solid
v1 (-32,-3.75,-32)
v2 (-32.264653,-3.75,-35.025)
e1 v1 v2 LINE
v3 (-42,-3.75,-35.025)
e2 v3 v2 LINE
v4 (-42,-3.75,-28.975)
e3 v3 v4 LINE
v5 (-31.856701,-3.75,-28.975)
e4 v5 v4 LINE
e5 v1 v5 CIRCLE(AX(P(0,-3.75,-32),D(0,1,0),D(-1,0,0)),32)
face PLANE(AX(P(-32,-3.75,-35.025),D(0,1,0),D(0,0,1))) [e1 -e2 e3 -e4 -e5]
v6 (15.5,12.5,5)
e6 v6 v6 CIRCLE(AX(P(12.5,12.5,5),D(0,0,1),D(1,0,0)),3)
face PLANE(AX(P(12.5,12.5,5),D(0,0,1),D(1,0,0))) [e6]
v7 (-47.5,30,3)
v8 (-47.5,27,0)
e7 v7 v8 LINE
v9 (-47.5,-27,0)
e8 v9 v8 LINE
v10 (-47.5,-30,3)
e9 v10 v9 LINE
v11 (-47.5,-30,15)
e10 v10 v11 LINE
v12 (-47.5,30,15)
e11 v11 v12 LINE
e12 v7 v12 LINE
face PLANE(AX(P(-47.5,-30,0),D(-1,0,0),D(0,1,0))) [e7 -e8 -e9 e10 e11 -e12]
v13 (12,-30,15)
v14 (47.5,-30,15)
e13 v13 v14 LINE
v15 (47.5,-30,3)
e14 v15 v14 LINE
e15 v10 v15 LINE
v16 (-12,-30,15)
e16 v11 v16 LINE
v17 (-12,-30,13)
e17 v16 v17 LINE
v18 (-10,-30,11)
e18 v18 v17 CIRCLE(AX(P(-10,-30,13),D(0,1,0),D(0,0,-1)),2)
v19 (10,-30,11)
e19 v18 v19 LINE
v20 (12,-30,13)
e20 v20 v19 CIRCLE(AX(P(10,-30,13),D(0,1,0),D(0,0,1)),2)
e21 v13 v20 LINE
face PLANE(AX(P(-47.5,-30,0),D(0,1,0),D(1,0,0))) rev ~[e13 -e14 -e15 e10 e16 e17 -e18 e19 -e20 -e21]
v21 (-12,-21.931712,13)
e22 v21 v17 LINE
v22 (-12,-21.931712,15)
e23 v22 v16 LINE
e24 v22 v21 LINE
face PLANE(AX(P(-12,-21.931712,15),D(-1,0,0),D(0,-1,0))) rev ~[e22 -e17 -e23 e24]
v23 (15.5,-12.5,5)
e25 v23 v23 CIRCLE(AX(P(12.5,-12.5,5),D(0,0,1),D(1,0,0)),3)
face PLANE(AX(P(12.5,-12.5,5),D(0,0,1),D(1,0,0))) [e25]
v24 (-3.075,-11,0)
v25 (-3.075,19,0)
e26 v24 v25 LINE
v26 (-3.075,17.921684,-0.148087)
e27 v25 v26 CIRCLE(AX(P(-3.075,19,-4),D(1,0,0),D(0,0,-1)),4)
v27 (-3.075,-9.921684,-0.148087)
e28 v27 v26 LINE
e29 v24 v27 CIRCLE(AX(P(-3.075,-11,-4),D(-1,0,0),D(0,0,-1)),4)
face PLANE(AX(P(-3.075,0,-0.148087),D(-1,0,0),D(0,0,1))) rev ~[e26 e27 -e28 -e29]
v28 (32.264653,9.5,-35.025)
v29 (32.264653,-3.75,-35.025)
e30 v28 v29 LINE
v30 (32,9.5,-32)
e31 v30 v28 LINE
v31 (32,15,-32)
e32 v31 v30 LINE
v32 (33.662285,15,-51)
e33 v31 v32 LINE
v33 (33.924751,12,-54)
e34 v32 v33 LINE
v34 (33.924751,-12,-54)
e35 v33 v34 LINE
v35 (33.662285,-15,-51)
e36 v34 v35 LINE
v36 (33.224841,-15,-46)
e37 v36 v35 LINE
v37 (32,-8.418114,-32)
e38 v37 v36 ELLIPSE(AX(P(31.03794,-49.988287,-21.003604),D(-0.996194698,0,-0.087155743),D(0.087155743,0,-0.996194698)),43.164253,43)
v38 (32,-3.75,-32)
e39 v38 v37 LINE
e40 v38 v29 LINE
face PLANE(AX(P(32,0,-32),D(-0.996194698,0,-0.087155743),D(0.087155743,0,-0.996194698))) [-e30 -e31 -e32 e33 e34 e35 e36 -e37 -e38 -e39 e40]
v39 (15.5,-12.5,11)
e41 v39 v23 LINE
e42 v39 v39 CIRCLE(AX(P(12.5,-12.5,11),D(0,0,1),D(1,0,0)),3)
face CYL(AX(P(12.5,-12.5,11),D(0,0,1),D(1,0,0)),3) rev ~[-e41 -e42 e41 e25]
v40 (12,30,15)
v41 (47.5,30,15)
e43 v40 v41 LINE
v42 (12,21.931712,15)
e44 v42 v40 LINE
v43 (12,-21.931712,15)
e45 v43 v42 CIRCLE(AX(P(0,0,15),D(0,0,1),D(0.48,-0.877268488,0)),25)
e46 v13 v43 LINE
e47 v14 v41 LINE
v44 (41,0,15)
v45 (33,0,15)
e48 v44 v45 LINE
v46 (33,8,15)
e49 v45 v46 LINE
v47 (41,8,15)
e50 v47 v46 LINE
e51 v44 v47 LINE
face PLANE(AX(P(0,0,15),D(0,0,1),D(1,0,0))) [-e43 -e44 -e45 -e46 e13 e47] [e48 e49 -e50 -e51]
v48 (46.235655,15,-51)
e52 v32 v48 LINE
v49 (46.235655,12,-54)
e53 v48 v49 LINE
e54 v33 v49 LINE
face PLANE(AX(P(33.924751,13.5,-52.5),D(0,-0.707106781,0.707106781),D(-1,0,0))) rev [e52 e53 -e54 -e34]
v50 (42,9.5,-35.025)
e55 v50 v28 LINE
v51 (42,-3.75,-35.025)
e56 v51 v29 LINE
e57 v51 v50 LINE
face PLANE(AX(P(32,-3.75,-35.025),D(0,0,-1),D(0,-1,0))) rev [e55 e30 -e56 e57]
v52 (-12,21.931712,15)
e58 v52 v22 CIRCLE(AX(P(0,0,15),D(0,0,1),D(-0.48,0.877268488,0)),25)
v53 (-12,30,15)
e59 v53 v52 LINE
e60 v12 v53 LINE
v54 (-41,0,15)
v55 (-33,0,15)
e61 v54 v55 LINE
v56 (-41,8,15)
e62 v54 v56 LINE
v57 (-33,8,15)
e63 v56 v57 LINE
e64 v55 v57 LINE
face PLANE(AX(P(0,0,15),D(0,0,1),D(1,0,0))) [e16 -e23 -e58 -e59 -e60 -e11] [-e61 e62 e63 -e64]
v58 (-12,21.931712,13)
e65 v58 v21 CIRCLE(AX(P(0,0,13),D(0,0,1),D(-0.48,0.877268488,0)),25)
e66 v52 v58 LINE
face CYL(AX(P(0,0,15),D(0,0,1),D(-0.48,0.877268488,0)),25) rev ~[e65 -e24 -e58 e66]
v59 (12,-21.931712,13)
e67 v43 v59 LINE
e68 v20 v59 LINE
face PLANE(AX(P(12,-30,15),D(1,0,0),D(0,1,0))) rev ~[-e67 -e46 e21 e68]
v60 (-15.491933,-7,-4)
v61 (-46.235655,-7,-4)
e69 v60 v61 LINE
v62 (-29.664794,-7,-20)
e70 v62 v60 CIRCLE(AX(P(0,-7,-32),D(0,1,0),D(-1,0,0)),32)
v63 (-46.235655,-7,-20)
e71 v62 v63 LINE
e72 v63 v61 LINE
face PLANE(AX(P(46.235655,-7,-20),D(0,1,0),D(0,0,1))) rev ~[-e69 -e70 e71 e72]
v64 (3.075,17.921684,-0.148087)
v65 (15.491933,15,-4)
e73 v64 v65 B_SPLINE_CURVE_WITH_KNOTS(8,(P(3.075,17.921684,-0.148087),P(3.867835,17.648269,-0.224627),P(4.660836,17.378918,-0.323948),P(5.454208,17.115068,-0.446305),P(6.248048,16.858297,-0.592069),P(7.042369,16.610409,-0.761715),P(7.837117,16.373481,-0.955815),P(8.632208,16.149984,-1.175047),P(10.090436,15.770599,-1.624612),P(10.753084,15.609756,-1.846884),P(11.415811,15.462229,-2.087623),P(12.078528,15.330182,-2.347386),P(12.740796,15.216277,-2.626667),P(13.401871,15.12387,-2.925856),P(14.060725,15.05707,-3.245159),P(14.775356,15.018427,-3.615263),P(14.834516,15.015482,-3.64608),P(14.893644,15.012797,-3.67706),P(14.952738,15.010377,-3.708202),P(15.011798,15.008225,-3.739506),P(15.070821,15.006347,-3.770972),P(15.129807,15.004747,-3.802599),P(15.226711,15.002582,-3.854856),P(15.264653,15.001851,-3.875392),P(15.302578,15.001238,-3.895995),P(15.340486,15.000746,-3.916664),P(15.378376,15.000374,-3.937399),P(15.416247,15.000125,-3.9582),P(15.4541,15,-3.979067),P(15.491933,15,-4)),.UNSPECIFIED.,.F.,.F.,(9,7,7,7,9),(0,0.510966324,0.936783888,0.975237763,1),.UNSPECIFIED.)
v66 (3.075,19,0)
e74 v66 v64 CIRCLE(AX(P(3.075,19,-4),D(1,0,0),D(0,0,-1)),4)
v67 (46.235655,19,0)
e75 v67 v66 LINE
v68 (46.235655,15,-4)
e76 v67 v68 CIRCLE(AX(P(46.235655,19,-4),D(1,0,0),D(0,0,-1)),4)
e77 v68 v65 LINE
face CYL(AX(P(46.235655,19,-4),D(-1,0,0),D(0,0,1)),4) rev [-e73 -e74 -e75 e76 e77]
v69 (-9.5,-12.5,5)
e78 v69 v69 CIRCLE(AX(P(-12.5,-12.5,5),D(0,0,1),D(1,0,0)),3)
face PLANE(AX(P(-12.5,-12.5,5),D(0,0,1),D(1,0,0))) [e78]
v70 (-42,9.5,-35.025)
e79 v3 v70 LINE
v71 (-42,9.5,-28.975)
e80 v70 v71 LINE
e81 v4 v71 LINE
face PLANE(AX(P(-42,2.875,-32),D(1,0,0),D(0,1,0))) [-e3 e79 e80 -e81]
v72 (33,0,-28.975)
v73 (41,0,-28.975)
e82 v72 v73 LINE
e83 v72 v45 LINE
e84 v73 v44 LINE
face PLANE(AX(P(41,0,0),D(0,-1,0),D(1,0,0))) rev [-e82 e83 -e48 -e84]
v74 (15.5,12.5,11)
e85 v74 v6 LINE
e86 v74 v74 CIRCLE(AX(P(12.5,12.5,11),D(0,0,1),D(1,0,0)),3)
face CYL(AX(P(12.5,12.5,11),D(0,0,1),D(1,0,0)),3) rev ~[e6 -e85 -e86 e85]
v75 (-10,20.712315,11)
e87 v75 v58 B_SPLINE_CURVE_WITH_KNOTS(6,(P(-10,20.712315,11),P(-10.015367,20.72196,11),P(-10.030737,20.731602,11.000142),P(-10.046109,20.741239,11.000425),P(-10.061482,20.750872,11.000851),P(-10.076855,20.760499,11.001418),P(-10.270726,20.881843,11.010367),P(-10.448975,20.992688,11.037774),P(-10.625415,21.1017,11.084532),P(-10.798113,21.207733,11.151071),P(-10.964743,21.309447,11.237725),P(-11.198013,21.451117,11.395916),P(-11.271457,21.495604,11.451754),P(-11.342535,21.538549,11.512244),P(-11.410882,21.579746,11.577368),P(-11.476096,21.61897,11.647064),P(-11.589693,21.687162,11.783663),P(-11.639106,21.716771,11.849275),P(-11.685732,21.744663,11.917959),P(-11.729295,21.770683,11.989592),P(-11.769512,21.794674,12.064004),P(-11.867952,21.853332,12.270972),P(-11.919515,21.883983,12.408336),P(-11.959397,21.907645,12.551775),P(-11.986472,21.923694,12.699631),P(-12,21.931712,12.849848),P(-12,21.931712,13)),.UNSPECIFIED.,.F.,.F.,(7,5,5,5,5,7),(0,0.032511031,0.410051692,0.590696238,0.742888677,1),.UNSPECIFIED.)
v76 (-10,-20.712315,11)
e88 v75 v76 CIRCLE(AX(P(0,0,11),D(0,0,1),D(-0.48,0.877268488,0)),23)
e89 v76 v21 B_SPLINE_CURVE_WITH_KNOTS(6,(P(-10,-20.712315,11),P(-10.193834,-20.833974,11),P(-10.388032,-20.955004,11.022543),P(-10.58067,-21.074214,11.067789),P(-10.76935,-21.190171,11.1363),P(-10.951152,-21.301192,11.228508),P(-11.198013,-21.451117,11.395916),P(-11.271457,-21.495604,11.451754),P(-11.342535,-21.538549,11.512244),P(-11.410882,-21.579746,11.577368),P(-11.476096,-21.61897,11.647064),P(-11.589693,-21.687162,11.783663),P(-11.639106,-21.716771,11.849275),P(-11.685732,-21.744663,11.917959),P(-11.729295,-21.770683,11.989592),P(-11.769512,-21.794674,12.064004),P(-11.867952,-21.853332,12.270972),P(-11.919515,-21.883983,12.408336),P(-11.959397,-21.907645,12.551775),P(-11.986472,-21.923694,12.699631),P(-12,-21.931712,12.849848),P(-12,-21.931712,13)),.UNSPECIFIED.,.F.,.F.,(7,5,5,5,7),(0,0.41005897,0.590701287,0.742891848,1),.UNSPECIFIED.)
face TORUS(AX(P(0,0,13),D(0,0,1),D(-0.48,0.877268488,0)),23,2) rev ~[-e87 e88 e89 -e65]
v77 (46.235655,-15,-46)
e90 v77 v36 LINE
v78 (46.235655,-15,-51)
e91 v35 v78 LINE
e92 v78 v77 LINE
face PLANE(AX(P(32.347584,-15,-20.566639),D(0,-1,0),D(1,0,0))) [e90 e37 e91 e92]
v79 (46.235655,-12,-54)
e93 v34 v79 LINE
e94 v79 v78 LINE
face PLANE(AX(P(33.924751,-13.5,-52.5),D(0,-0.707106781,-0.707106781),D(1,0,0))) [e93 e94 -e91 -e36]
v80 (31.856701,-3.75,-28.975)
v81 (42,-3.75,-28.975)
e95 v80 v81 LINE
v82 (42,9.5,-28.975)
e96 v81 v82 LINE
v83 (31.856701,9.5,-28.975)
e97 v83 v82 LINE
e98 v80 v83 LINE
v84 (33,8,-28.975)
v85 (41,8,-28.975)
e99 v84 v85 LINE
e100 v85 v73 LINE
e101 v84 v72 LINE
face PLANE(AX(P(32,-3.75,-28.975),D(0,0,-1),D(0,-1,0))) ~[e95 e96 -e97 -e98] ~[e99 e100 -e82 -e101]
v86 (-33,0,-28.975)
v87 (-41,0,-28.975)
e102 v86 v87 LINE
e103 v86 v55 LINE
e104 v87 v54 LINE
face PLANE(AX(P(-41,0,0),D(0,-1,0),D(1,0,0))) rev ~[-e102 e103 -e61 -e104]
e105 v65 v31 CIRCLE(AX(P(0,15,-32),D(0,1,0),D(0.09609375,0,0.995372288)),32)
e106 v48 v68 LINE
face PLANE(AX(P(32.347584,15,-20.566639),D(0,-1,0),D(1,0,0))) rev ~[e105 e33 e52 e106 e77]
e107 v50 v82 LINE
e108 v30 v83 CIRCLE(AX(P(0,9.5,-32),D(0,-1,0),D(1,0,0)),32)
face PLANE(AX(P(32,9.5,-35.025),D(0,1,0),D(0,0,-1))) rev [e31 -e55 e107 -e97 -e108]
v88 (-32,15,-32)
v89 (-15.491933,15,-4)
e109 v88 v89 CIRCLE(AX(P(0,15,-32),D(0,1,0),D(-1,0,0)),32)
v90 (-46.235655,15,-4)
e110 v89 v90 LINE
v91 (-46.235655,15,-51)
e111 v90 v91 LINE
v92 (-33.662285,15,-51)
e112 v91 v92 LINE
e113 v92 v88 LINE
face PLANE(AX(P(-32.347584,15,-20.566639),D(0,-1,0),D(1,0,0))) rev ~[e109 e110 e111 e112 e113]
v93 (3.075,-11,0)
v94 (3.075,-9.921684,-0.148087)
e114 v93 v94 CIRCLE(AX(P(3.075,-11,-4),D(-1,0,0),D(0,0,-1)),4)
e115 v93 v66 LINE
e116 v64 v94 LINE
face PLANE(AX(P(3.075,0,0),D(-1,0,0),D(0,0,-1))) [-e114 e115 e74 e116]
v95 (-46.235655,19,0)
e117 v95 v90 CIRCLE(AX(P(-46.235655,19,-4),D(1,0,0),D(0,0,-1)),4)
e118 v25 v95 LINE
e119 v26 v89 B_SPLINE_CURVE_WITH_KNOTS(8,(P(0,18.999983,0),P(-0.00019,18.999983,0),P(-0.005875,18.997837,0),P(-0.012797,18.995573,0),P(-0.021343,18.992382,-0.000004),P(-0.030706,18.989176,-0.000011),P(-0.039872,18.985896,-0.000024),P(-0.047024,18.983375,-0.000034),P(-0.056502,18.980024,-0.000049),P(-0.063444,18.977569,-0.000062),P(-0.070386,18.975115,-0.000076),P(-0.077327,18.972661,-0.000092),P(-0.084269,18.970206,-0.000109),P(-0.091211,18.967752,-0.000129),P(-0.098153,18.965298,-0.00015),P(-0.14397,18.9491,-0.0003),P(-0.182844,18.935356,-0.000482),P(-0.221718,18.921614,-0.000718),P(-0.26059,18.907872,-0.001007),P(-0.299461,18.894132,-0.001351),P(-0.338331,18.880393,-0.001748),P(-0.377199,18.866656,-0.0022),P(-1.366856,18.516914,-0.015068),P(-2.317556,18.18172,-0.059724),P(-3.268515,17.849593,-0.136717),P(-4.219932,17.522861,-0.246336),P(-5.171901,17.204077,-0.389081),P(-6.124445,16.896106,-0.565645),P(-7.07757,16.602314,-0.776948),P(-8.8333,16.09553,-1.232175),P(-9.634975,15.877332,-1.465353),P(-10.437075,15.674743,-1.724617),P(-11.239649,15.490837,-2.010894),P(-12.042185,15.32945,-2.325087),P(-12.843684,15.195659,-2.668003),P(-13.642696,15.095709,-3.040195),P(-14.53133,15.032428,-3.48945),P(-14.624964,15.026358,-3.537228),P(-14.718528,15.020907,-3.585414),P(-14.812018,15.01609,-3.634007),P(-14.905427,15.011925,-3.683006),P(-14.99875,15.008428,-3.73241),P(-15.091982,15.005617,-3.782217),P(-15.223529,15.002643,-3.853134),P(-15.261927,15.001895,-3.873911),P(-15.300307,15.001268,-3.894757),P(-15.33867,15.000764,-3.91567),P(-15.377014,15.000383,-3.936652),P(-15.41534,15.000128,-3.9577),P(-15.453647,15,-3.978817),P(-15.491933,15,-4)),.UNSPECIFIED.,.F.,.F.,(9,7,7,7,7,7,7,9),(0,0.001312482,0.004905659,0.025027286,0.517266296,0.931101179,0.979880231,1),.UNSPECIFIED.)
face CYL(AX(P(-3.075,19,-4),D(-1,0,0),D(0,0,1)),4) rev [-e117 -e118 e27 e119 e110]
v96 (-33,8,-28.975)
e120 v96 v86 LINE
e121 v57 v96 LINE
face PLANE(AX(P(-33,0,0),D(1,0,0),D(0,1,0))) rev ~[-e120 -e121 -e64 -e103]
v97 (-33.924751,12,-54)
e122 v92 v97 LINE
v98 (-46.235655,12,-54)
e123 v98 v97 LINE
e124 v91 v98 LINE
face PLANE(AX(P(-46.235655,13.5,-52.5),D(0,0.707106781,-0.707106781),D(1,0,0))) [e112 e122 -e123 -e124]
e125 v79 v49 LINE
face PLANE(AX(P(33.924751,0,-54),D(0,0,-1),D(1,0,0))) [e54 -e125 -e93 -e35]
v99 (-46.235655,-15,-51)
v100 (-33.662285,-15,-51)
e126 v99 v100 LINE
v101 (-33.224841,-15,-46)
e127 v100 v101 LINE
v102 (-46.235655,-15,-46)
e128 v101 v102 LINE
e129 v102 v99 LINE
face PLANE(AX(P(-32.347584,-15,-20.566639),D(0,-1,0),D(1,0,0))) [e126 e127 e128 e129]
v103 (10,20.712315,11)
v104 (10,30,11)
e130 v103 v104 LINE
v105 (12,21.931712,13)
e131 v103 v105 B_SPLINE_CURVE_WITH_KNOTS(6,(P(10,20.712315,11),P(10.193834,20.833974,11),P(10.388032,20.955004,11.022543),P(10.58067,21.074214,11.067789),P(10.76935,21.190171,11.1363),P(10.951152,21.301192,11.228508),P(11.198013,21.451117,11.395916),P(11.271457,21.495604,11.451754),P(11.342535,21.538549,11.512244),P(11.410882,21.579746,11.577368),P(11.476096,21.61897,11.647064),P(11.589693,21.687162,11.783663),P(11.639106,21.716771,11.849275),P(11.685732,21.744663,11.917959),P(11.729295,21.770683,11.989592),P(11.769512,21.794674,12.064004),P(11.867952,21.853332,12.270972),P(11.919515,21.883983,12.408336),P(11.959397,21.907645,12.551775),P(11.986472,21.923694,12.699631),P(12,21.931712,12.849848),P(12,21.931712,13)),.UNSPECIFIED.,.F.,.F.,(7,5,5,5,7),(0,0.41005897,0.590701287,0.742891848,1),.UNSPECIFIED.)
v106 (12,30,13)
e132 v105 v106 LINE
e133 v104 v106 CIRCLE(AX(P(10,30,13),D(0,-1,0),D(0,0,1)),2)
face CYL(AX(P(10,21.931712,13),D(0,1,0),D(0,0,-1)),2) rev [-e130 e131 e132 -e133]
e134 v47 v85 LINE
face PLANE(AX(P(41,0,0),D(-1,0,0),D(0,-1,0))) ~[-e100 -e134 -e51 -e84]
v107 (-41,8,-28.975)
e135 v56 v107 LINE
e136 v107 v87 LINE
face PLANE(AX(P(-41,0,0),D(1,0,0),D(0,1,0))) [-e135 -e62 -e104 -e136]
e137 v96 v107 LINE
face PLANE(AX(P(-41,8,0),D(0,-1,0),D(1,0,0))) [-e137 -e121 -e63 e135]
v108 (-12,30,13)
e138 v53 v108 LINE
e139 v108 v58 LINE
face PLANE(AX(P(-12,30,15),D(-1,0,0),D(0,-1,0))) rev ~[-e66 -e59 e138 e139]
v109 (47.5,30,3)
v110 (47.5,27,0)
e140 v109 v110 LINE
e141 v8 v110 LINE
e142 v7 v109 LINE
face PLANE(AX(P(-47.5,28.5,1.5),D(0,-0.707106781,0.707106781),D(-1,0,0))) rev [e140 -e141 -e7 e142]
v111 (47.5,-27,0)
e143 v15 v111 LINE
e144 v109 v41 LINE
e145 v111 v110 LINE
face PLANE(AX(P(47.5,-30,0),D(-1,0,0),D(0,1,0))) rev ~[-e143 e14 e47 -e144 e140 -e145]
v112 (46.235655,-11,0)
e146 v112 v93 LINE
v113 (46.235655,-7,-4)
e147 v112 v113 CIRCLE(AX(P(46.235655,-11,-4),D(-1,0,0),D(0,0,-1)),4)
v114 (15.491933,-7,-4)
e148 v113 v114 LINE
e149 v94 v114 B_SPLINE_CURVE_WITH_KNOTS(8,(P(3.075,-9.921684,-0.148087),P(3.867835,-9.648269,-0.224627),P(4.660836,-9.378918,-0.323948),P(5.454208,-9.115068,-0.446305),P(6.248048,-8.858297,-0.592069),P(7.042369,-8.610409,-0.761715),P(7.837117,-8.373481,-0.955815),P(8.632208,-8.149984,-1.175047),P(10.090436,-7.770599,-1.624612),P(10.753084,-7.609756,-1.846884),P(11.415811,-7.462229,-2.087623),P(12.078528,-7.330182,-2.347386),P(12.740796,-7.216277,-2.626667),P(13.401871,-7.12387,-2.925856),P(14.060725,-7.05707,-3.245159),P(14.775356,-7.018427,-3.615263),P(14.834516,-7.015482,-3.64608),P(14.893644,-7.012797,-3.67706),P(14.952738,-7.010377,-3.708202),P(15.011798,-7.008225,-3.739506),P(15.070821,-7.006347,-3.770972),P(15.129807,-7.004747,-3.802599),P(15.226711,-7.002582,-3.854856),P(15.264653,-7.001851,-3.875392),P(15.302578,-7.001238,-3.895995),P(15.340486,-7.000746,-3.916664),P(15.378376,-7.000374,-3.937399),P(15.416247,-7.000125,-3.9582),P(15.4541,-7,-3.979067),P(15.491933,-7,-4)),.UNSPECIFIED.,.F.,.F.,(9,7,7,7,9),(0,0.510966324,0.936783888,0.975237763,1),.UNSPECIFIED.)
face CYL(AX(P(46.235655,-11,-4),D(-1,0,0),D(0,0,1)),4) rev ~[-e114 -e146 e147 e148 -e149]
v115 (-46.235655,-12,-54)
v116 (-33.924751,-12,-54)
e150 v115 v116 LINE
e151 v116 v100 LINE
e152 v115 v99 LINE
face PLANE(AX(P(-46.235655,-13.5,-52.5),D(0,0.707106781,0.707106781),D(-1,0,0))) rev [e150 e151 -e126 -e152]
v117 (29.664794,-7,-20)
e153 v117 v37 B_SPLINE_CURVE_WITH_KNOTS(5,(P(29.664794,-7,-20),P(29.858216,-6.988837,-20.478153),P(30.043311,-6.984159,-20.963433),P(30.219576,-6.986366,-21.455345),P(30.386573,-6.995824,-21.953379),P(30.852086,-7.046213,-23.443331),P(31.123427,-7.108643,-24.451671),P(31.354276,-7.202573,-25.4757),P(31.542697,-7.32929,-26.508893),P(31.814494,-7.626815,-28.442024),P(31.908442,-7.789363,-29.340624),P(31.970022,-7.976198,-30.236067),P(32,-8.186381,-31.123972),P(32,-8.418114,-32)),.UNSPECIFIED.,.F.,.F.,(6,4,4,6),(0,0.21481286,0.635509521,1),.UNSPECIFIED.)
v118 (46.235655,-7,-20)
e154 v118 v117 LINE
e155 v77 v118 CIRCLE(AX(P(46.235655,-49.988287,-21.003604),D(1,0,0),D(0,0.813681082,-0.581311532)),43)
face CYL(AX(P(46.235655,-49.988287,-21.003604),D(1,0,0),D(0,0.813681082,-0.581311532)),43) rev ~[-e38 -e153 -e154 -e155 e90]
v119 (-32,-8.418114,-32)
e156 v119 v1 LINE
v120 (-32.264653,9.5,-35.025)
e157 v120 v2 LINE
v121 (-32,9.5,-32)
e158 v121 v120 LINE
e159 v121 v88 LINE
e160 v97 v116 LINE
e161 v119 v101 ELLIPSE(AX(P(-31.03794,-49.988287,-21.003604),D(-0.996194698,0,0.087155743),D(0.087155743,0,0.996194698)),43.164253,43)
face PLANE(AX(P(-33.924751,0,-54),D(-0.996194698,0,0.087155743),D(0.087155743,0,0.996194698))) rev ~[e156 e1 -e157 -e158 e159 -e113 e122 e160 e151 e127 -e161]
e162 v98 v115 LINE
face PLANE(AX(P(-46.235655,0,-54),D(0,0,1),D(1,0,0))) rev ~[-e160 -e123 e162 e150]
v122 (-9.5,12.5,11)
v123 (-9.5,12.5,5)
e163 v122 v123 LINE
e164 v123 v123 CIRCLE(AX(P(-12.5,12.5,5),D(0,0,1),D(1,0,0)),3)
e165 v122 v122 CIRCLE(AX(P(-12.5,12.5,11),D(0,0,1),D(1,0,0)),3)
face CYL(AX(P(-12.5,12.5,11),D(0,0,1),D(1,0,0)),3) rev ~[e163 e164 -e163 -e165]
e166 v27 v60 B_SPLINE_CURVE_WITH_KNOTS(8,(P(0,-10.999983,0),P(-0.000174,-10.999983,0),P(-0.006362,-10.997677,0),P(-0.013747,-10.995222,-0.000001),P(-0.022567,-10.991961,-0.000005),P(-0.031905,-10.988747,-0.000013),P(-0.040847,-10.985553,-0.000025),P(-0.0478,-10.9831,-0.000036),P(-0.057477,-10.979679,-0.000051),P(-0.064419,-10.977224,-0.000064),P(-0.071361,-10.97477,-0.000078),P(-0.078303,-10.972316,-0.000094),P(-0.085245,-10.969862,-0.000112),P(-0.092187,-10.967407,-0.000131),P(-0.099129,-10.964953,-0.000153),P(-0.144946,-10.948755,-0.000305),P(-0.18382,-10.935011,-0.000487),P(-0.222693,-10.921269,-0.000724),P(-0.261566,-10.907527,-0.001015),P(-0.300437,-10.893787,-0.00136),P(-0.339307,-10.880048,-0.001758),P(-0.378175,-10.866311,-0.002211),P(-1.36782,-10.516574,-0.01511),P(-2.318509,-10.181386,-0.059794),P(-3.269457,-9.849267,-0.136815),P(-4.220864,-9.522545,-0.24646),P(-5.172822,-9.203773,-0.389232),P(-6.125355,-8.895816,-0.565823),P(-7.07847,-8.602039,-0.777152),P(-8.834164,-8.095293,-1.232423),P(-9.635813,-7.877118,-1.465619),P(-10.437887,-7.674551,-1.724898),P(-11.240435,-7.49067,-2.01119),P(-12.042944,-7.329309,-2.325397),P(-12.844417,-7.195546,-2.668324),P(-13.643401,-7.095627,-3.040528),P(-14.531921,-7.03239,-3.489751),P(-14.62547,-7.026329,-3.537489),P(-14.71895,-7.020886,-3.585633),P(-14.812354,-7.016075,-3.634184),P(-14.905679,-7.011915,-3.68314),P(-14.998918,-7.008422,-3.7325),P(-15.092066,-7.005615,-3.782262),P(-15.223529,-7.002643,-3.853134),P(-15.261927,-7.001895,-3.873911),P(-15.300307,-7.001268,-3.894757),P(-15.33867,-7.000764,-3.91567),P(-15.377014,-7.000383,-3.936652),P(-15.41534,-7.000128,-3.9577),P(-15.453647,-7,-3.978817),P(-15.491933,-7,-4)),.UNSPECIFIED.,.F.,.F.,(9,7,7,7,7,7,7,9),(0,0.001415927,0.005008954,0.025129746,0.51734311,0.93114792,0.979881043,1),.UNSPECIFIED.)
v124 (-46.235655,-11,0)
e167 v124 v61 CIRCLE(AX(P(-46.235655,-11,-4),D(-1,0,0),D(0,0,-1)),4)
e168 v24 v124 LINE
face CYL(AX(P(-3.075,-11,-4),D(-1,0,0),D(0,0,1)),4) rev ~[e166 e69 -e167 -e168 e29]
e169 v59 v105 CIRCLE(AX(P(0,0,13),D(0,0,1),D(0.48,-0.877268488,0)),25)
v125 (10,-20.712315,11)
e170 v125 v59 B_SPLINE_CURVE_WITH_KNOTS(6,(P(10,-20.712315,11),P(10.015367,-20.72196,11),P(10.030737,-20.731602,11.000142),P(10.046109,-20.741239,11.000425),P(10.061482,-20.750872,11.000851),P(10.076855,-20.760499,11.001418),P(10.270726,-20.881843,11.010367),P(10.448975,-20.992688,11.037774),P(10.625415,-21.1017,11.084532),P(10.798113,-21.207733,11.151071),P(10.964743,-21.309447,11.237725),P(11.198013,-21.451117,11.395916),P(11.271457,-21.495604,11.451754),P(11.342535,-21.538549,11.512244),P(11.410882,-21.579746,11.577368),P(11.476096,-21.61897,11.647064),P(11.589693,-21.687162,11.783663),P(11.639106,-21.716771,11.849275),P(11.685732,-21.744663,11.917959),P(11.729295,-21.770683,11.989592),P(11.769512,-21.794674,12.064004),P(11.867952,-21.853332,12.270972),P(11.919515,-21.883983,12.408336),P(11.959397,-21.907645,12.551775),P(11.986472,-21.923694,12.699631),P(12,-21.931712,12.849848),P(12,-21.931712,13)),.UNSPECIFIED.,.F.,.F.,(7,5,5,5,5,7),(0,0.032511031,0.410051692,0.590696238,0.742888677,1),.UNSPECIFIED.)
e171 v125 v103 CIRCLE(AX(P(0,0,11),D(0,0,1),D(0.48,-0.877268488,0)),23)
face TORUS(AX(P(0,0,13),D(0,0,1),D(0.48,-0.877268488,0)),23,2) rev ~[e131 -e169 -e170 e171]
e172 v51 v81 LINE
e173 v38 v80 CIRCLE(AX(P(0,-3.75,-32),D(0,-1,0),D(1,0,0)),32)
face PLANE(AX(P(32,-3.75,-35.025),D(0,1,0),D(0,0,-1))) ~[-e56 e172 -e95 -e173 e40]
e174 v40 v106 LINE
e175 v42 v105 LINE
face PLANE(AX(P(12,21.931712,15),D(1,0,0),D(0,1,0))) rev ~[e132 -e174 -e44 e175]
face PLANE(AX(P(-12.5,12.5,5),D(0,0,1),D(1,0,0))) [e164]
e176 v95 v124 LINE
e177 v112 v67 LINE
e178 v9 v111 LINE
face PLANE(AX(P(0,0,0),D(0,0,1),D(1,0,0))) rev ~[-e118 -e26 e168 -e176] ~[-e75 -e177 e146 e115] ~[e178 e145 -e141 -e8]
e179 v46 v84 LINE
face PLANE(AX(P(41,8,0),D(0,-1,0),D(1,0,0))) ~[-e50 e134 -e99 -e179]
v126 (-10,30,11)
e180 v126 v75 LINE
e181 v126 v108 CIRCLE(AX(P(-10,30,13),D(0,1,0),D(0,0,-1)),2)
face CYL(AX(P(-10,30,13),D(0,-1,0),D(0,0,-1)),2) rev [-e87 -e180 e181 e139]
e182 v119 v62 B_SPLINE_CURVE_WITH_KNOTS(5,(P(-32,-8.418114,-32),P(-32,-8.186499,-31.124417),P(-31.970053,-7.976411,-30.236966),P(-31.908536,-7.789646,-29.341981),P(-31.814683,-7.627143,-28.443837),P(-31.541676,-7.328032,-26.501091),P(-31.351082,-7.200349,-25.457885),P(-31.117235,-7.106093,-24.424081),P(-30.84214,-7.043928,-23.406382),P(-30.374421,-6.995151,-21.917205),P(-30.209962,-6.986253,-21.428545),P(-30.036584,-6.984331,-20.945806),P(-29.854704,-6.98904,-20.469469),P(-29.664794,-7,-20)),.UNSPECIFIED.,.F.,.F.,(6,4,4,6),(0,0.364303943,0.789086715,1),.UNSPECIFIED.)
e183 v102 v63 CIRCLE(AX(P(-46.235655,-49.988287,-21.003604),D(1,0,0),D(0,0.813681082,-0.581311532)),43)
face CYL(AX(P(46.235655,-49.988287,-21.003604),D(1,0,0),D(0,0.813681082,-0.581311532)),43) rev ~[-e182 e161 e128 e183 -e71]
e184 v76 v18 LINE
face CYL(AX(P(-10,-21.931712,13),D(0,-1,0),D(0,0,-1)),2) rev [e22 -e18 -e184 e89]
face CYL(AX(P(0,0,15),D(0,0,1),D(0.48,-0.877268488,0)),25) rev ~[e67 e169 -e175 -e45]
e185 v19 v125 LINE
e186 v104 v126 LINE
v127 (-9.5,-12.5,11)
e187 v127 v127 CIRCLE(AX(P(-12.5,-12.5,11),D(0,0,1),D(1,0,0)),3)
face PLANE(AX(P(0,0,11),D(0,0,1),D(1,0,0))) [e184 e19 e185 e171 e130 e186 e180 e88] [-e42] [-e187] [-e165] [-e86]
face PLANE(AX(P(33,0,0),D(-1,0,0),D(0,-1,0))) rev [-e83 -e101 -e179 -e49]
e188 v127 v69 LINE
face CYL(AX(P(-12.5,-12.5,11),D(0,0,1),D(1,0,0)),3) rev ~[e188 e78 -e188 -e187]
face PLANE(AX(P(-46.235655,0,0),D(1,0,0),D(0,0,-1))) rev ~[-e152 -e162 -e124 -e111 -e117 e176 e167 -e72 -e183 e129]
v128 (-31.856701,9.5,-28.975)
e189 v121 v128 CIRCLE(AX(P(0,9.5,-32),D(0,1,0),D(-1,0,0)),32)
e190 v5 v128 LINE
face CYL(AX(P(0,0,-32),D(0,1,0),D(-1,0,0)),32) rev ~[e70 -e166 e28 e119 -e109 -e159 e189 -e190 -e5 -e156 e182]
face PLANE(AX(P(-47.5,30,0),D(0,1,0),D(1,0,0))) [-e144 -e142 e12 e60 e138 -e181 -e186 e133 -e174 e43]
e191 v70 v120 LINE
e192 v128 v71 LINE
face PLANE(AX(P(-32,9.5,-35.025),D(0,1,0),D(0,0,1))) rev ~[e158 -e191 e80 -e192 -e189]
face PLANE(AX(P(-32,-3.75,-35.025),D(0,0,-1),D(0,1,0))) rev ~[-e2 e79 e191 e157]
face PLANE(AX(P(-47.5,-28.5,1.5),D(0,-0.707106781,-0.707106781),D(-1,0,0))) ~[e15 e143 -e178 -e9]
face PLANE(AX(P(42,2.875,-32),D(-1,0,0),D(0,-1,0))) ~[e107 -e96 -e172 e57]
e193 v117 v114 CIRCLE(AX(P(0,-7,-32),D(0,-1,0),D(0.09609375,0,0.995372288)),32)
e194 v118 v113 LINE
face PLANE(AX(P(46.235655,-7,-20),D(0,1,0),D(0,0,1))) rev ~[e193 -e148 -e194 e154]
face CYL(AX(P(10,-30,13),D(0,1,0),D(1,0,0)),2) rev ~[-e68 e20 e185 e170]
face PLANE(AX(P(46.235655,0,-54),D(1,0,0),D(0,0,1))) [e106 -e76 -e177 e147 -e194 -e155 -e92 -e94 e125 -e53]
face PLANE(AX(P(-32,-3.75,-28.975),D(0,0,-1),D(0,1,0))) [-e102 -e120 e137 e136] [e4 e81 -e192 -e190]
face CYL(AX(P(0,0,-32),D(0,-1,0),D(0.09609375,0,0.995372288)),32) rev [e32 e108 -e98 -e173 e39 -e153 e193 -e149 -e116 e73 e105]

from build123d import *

# Parameters (mm, degrees)
F0_W      = 95
F0_H      = 60
F1_DEPTH  = 15
F3_DEPTH  = 15
F5_W      = 13.25
F5_H      = 6.05
F6_DEPTH  = 10
F7_W      = 8
F7_H      = 8
F8_DEPTH  = 29
F11_DEPTH = 93
F12_SIZE  = 3
F14_DEPTH = 4
F15_R     = 3
F16_DEPTH = 6
F17_R     = 2
F18_R     = 4


with BuildPart() as f1:
    # F0 (on Top) → F1 (new body)
    with BuildSketch(Plane.XY):
        Rectangle(F0_W, F0_H)
    extrude(amount=F1_DEPTH)

    # F2 (on Front) → F3 (join, symmetric)
    with BuildSketch(Plane.XZ):
        with BuildLine():
            Line((-3.075, 0), (-46.235655491, 0))
            Line((-46.235655491, 0), (-46.235655491, -54))
            Line((-46.235655491, -54), (-33.9247505976, -54))
            Line((-33.9247505976, -54), (-32, -32))
            ThreePointArc((-32, -32), (-23.6896601917, -10.4872131048), (-3.075, -0.1480867922))
            Line((-3.075, -0.1480867922), (-3.075, 0))
        make_face()
        with BuildLine():
            Line((3.075, 0), (3.075, -0.1480867922))
            ThreePointArc((3.075, -0.1480867922), (23.6896601917, -10.4872131048), (32, -32))
            Line((32, -32), (33.9247505976, -54))
            Line((33.9247505976, -54), (46.235655491, -54))
            Line((46.235655491, -54), (46.235655491, 0))
            Line((46.235655491, 0), (3.075, 0))
        make_face()
    extrude(amount=F3_DEPTH, both=True)

    # F5 (on offset) → F6 (cut, symmetric)
    with BuildSketch(Plane.YZ.offset(-32)):
        with Locations((2.875, -32)):
            Rectangle(F5_W, F5_H)
    extrude(amount=F6_DEPTH, both=True, mode=Mode.SUBTRACT)

    # F7 (on Top) → F8 (cut, symmetric)
    with BuildSketch(Plane.XY):
        with Locations((-37, 4)):
            Rectangle(F7_W, F7_H)
    extrude(amount=F8_DEPTH, both=True, mode=Mode.SUBTRACT)

    # F9: F1 across plane


with BuildPart() as f1_1:
    add(f1.part)
    add(f1.part.mirror(Plane.YZ), mode=Mode.INTERSECT)

    # F10 (on face) → F11 (cut)
    with BuildSketch(Plane.YZ.offset(46.235655491)):
        with BuildLine():
            Line((-7, -20), (-7, 0))
            Line((-7, 0), (-15, 0))
            Line((-15, 0), (-15, -46))
            ThreePointArc((-15, -46), (-8.8897891542, -33.6492956449), (-7, -20))
        make_face()
    extrude(amount=-F11_DEPTH, mode=Mode.SUBTRACT)

    # F12
    f12_edges = [f1_1.edges().sort_by_distance(p)[0] for p in [
        (40.080203, -15, -54),
        (-40.080203, -15, -54),
        (0, -30, 0),
        (0, 30, 0),
        (40.080203, 15, -54),
        (-40.080203, 15, -54),
    ]]
    chamfer(f12_edges, length=F12_SIZE)

    # F13 (on face) → F14 (cut)
    with BuildSketch(Plane.XY.offset(15)):
        with BuildLine():
            Line((-12, 30), (-12, 21.9317121995))
            ThreePointArc((-12, 21.9317121995), (-25, 0), (-12, -21.9317121995))
            Line((-12, -21.9317121995), (-12, -30))
            Line((-12, -30), (12, -30))
            Line((12, -30), (12, -21.9317121995))
            ThreePointArc((12, -21.9317121995), (25, 0), (12, 21.9317121995))
            Line((12, 21.9317121995), (12, 30))
            Line((12, 30), (-12, 30))
        make_face()
    extrude(amount=-F14_DEPTH, mode=Mode.SUBTRACT)

    # F15 (on face) → F16 (cut)
    with BuildSketch(Plane.XY.offset(11)):
        with Locations((12.5, -12.5)):
            Circle(F15_R)
        with Locations((-12.5, -12.5)):
            Circle(F15_R)
        with Locations((-12.5, 12.5)):
            Circle(F15_R)
        with Locations((12.5, 12.5)):
            Circle(F15_R)
    extrude(amount=-F16_DEPTH, mode=Mode.SUBTRACT)

    # F17
    f17_edges = [f1_1.edges().sort_by_distance(p)[0] for p in [
        (-25, 0, 11),
        (25, 0, 11),
        (-12, -25.965856, 11),
        (12, -25.965856, 11),
        (12, 25.965856, 11),
        (-12, 25.965856, 11),
    ]]
    fillet(f17_edges, radius=F17_R)

    # F18 (call 1 of 4: OpenCascade refuses the feature's edges together)
    f18_edges = [f1_1.edges().sort_by_distance(p)[0] for p in [
        (-24.655328, -7, 0),
    ]]
    fillet(f18_edges, radius=F18_R)

    # F18#2 (call 2 of 4)
    f18_2_edges = [f1_1.edges().sort_by_distance(p)[0] for p in [
        (24.655328, -7, 0),
    ]]
    fillet(f18_2_edges, radius=F18_R)

    # F18#3 (call 3 of 4)
    f18_3_edges = [f1_1.edges().sort_by_distance(p)[0] for p in [
        (24.655328, 15, 0),
    ]]
    fillet(f18_3_edges, radius=F18_R)

    # F18#4 (call 4 of 4)
    f18_4_edges = [f1_1.edges().sort_by_distance(p)[0] for p in [
        (-24.655328, 15, 0),
    ]]
    fillet(f18_4_edges, radius=F18_R)


solid = f1_1.part
